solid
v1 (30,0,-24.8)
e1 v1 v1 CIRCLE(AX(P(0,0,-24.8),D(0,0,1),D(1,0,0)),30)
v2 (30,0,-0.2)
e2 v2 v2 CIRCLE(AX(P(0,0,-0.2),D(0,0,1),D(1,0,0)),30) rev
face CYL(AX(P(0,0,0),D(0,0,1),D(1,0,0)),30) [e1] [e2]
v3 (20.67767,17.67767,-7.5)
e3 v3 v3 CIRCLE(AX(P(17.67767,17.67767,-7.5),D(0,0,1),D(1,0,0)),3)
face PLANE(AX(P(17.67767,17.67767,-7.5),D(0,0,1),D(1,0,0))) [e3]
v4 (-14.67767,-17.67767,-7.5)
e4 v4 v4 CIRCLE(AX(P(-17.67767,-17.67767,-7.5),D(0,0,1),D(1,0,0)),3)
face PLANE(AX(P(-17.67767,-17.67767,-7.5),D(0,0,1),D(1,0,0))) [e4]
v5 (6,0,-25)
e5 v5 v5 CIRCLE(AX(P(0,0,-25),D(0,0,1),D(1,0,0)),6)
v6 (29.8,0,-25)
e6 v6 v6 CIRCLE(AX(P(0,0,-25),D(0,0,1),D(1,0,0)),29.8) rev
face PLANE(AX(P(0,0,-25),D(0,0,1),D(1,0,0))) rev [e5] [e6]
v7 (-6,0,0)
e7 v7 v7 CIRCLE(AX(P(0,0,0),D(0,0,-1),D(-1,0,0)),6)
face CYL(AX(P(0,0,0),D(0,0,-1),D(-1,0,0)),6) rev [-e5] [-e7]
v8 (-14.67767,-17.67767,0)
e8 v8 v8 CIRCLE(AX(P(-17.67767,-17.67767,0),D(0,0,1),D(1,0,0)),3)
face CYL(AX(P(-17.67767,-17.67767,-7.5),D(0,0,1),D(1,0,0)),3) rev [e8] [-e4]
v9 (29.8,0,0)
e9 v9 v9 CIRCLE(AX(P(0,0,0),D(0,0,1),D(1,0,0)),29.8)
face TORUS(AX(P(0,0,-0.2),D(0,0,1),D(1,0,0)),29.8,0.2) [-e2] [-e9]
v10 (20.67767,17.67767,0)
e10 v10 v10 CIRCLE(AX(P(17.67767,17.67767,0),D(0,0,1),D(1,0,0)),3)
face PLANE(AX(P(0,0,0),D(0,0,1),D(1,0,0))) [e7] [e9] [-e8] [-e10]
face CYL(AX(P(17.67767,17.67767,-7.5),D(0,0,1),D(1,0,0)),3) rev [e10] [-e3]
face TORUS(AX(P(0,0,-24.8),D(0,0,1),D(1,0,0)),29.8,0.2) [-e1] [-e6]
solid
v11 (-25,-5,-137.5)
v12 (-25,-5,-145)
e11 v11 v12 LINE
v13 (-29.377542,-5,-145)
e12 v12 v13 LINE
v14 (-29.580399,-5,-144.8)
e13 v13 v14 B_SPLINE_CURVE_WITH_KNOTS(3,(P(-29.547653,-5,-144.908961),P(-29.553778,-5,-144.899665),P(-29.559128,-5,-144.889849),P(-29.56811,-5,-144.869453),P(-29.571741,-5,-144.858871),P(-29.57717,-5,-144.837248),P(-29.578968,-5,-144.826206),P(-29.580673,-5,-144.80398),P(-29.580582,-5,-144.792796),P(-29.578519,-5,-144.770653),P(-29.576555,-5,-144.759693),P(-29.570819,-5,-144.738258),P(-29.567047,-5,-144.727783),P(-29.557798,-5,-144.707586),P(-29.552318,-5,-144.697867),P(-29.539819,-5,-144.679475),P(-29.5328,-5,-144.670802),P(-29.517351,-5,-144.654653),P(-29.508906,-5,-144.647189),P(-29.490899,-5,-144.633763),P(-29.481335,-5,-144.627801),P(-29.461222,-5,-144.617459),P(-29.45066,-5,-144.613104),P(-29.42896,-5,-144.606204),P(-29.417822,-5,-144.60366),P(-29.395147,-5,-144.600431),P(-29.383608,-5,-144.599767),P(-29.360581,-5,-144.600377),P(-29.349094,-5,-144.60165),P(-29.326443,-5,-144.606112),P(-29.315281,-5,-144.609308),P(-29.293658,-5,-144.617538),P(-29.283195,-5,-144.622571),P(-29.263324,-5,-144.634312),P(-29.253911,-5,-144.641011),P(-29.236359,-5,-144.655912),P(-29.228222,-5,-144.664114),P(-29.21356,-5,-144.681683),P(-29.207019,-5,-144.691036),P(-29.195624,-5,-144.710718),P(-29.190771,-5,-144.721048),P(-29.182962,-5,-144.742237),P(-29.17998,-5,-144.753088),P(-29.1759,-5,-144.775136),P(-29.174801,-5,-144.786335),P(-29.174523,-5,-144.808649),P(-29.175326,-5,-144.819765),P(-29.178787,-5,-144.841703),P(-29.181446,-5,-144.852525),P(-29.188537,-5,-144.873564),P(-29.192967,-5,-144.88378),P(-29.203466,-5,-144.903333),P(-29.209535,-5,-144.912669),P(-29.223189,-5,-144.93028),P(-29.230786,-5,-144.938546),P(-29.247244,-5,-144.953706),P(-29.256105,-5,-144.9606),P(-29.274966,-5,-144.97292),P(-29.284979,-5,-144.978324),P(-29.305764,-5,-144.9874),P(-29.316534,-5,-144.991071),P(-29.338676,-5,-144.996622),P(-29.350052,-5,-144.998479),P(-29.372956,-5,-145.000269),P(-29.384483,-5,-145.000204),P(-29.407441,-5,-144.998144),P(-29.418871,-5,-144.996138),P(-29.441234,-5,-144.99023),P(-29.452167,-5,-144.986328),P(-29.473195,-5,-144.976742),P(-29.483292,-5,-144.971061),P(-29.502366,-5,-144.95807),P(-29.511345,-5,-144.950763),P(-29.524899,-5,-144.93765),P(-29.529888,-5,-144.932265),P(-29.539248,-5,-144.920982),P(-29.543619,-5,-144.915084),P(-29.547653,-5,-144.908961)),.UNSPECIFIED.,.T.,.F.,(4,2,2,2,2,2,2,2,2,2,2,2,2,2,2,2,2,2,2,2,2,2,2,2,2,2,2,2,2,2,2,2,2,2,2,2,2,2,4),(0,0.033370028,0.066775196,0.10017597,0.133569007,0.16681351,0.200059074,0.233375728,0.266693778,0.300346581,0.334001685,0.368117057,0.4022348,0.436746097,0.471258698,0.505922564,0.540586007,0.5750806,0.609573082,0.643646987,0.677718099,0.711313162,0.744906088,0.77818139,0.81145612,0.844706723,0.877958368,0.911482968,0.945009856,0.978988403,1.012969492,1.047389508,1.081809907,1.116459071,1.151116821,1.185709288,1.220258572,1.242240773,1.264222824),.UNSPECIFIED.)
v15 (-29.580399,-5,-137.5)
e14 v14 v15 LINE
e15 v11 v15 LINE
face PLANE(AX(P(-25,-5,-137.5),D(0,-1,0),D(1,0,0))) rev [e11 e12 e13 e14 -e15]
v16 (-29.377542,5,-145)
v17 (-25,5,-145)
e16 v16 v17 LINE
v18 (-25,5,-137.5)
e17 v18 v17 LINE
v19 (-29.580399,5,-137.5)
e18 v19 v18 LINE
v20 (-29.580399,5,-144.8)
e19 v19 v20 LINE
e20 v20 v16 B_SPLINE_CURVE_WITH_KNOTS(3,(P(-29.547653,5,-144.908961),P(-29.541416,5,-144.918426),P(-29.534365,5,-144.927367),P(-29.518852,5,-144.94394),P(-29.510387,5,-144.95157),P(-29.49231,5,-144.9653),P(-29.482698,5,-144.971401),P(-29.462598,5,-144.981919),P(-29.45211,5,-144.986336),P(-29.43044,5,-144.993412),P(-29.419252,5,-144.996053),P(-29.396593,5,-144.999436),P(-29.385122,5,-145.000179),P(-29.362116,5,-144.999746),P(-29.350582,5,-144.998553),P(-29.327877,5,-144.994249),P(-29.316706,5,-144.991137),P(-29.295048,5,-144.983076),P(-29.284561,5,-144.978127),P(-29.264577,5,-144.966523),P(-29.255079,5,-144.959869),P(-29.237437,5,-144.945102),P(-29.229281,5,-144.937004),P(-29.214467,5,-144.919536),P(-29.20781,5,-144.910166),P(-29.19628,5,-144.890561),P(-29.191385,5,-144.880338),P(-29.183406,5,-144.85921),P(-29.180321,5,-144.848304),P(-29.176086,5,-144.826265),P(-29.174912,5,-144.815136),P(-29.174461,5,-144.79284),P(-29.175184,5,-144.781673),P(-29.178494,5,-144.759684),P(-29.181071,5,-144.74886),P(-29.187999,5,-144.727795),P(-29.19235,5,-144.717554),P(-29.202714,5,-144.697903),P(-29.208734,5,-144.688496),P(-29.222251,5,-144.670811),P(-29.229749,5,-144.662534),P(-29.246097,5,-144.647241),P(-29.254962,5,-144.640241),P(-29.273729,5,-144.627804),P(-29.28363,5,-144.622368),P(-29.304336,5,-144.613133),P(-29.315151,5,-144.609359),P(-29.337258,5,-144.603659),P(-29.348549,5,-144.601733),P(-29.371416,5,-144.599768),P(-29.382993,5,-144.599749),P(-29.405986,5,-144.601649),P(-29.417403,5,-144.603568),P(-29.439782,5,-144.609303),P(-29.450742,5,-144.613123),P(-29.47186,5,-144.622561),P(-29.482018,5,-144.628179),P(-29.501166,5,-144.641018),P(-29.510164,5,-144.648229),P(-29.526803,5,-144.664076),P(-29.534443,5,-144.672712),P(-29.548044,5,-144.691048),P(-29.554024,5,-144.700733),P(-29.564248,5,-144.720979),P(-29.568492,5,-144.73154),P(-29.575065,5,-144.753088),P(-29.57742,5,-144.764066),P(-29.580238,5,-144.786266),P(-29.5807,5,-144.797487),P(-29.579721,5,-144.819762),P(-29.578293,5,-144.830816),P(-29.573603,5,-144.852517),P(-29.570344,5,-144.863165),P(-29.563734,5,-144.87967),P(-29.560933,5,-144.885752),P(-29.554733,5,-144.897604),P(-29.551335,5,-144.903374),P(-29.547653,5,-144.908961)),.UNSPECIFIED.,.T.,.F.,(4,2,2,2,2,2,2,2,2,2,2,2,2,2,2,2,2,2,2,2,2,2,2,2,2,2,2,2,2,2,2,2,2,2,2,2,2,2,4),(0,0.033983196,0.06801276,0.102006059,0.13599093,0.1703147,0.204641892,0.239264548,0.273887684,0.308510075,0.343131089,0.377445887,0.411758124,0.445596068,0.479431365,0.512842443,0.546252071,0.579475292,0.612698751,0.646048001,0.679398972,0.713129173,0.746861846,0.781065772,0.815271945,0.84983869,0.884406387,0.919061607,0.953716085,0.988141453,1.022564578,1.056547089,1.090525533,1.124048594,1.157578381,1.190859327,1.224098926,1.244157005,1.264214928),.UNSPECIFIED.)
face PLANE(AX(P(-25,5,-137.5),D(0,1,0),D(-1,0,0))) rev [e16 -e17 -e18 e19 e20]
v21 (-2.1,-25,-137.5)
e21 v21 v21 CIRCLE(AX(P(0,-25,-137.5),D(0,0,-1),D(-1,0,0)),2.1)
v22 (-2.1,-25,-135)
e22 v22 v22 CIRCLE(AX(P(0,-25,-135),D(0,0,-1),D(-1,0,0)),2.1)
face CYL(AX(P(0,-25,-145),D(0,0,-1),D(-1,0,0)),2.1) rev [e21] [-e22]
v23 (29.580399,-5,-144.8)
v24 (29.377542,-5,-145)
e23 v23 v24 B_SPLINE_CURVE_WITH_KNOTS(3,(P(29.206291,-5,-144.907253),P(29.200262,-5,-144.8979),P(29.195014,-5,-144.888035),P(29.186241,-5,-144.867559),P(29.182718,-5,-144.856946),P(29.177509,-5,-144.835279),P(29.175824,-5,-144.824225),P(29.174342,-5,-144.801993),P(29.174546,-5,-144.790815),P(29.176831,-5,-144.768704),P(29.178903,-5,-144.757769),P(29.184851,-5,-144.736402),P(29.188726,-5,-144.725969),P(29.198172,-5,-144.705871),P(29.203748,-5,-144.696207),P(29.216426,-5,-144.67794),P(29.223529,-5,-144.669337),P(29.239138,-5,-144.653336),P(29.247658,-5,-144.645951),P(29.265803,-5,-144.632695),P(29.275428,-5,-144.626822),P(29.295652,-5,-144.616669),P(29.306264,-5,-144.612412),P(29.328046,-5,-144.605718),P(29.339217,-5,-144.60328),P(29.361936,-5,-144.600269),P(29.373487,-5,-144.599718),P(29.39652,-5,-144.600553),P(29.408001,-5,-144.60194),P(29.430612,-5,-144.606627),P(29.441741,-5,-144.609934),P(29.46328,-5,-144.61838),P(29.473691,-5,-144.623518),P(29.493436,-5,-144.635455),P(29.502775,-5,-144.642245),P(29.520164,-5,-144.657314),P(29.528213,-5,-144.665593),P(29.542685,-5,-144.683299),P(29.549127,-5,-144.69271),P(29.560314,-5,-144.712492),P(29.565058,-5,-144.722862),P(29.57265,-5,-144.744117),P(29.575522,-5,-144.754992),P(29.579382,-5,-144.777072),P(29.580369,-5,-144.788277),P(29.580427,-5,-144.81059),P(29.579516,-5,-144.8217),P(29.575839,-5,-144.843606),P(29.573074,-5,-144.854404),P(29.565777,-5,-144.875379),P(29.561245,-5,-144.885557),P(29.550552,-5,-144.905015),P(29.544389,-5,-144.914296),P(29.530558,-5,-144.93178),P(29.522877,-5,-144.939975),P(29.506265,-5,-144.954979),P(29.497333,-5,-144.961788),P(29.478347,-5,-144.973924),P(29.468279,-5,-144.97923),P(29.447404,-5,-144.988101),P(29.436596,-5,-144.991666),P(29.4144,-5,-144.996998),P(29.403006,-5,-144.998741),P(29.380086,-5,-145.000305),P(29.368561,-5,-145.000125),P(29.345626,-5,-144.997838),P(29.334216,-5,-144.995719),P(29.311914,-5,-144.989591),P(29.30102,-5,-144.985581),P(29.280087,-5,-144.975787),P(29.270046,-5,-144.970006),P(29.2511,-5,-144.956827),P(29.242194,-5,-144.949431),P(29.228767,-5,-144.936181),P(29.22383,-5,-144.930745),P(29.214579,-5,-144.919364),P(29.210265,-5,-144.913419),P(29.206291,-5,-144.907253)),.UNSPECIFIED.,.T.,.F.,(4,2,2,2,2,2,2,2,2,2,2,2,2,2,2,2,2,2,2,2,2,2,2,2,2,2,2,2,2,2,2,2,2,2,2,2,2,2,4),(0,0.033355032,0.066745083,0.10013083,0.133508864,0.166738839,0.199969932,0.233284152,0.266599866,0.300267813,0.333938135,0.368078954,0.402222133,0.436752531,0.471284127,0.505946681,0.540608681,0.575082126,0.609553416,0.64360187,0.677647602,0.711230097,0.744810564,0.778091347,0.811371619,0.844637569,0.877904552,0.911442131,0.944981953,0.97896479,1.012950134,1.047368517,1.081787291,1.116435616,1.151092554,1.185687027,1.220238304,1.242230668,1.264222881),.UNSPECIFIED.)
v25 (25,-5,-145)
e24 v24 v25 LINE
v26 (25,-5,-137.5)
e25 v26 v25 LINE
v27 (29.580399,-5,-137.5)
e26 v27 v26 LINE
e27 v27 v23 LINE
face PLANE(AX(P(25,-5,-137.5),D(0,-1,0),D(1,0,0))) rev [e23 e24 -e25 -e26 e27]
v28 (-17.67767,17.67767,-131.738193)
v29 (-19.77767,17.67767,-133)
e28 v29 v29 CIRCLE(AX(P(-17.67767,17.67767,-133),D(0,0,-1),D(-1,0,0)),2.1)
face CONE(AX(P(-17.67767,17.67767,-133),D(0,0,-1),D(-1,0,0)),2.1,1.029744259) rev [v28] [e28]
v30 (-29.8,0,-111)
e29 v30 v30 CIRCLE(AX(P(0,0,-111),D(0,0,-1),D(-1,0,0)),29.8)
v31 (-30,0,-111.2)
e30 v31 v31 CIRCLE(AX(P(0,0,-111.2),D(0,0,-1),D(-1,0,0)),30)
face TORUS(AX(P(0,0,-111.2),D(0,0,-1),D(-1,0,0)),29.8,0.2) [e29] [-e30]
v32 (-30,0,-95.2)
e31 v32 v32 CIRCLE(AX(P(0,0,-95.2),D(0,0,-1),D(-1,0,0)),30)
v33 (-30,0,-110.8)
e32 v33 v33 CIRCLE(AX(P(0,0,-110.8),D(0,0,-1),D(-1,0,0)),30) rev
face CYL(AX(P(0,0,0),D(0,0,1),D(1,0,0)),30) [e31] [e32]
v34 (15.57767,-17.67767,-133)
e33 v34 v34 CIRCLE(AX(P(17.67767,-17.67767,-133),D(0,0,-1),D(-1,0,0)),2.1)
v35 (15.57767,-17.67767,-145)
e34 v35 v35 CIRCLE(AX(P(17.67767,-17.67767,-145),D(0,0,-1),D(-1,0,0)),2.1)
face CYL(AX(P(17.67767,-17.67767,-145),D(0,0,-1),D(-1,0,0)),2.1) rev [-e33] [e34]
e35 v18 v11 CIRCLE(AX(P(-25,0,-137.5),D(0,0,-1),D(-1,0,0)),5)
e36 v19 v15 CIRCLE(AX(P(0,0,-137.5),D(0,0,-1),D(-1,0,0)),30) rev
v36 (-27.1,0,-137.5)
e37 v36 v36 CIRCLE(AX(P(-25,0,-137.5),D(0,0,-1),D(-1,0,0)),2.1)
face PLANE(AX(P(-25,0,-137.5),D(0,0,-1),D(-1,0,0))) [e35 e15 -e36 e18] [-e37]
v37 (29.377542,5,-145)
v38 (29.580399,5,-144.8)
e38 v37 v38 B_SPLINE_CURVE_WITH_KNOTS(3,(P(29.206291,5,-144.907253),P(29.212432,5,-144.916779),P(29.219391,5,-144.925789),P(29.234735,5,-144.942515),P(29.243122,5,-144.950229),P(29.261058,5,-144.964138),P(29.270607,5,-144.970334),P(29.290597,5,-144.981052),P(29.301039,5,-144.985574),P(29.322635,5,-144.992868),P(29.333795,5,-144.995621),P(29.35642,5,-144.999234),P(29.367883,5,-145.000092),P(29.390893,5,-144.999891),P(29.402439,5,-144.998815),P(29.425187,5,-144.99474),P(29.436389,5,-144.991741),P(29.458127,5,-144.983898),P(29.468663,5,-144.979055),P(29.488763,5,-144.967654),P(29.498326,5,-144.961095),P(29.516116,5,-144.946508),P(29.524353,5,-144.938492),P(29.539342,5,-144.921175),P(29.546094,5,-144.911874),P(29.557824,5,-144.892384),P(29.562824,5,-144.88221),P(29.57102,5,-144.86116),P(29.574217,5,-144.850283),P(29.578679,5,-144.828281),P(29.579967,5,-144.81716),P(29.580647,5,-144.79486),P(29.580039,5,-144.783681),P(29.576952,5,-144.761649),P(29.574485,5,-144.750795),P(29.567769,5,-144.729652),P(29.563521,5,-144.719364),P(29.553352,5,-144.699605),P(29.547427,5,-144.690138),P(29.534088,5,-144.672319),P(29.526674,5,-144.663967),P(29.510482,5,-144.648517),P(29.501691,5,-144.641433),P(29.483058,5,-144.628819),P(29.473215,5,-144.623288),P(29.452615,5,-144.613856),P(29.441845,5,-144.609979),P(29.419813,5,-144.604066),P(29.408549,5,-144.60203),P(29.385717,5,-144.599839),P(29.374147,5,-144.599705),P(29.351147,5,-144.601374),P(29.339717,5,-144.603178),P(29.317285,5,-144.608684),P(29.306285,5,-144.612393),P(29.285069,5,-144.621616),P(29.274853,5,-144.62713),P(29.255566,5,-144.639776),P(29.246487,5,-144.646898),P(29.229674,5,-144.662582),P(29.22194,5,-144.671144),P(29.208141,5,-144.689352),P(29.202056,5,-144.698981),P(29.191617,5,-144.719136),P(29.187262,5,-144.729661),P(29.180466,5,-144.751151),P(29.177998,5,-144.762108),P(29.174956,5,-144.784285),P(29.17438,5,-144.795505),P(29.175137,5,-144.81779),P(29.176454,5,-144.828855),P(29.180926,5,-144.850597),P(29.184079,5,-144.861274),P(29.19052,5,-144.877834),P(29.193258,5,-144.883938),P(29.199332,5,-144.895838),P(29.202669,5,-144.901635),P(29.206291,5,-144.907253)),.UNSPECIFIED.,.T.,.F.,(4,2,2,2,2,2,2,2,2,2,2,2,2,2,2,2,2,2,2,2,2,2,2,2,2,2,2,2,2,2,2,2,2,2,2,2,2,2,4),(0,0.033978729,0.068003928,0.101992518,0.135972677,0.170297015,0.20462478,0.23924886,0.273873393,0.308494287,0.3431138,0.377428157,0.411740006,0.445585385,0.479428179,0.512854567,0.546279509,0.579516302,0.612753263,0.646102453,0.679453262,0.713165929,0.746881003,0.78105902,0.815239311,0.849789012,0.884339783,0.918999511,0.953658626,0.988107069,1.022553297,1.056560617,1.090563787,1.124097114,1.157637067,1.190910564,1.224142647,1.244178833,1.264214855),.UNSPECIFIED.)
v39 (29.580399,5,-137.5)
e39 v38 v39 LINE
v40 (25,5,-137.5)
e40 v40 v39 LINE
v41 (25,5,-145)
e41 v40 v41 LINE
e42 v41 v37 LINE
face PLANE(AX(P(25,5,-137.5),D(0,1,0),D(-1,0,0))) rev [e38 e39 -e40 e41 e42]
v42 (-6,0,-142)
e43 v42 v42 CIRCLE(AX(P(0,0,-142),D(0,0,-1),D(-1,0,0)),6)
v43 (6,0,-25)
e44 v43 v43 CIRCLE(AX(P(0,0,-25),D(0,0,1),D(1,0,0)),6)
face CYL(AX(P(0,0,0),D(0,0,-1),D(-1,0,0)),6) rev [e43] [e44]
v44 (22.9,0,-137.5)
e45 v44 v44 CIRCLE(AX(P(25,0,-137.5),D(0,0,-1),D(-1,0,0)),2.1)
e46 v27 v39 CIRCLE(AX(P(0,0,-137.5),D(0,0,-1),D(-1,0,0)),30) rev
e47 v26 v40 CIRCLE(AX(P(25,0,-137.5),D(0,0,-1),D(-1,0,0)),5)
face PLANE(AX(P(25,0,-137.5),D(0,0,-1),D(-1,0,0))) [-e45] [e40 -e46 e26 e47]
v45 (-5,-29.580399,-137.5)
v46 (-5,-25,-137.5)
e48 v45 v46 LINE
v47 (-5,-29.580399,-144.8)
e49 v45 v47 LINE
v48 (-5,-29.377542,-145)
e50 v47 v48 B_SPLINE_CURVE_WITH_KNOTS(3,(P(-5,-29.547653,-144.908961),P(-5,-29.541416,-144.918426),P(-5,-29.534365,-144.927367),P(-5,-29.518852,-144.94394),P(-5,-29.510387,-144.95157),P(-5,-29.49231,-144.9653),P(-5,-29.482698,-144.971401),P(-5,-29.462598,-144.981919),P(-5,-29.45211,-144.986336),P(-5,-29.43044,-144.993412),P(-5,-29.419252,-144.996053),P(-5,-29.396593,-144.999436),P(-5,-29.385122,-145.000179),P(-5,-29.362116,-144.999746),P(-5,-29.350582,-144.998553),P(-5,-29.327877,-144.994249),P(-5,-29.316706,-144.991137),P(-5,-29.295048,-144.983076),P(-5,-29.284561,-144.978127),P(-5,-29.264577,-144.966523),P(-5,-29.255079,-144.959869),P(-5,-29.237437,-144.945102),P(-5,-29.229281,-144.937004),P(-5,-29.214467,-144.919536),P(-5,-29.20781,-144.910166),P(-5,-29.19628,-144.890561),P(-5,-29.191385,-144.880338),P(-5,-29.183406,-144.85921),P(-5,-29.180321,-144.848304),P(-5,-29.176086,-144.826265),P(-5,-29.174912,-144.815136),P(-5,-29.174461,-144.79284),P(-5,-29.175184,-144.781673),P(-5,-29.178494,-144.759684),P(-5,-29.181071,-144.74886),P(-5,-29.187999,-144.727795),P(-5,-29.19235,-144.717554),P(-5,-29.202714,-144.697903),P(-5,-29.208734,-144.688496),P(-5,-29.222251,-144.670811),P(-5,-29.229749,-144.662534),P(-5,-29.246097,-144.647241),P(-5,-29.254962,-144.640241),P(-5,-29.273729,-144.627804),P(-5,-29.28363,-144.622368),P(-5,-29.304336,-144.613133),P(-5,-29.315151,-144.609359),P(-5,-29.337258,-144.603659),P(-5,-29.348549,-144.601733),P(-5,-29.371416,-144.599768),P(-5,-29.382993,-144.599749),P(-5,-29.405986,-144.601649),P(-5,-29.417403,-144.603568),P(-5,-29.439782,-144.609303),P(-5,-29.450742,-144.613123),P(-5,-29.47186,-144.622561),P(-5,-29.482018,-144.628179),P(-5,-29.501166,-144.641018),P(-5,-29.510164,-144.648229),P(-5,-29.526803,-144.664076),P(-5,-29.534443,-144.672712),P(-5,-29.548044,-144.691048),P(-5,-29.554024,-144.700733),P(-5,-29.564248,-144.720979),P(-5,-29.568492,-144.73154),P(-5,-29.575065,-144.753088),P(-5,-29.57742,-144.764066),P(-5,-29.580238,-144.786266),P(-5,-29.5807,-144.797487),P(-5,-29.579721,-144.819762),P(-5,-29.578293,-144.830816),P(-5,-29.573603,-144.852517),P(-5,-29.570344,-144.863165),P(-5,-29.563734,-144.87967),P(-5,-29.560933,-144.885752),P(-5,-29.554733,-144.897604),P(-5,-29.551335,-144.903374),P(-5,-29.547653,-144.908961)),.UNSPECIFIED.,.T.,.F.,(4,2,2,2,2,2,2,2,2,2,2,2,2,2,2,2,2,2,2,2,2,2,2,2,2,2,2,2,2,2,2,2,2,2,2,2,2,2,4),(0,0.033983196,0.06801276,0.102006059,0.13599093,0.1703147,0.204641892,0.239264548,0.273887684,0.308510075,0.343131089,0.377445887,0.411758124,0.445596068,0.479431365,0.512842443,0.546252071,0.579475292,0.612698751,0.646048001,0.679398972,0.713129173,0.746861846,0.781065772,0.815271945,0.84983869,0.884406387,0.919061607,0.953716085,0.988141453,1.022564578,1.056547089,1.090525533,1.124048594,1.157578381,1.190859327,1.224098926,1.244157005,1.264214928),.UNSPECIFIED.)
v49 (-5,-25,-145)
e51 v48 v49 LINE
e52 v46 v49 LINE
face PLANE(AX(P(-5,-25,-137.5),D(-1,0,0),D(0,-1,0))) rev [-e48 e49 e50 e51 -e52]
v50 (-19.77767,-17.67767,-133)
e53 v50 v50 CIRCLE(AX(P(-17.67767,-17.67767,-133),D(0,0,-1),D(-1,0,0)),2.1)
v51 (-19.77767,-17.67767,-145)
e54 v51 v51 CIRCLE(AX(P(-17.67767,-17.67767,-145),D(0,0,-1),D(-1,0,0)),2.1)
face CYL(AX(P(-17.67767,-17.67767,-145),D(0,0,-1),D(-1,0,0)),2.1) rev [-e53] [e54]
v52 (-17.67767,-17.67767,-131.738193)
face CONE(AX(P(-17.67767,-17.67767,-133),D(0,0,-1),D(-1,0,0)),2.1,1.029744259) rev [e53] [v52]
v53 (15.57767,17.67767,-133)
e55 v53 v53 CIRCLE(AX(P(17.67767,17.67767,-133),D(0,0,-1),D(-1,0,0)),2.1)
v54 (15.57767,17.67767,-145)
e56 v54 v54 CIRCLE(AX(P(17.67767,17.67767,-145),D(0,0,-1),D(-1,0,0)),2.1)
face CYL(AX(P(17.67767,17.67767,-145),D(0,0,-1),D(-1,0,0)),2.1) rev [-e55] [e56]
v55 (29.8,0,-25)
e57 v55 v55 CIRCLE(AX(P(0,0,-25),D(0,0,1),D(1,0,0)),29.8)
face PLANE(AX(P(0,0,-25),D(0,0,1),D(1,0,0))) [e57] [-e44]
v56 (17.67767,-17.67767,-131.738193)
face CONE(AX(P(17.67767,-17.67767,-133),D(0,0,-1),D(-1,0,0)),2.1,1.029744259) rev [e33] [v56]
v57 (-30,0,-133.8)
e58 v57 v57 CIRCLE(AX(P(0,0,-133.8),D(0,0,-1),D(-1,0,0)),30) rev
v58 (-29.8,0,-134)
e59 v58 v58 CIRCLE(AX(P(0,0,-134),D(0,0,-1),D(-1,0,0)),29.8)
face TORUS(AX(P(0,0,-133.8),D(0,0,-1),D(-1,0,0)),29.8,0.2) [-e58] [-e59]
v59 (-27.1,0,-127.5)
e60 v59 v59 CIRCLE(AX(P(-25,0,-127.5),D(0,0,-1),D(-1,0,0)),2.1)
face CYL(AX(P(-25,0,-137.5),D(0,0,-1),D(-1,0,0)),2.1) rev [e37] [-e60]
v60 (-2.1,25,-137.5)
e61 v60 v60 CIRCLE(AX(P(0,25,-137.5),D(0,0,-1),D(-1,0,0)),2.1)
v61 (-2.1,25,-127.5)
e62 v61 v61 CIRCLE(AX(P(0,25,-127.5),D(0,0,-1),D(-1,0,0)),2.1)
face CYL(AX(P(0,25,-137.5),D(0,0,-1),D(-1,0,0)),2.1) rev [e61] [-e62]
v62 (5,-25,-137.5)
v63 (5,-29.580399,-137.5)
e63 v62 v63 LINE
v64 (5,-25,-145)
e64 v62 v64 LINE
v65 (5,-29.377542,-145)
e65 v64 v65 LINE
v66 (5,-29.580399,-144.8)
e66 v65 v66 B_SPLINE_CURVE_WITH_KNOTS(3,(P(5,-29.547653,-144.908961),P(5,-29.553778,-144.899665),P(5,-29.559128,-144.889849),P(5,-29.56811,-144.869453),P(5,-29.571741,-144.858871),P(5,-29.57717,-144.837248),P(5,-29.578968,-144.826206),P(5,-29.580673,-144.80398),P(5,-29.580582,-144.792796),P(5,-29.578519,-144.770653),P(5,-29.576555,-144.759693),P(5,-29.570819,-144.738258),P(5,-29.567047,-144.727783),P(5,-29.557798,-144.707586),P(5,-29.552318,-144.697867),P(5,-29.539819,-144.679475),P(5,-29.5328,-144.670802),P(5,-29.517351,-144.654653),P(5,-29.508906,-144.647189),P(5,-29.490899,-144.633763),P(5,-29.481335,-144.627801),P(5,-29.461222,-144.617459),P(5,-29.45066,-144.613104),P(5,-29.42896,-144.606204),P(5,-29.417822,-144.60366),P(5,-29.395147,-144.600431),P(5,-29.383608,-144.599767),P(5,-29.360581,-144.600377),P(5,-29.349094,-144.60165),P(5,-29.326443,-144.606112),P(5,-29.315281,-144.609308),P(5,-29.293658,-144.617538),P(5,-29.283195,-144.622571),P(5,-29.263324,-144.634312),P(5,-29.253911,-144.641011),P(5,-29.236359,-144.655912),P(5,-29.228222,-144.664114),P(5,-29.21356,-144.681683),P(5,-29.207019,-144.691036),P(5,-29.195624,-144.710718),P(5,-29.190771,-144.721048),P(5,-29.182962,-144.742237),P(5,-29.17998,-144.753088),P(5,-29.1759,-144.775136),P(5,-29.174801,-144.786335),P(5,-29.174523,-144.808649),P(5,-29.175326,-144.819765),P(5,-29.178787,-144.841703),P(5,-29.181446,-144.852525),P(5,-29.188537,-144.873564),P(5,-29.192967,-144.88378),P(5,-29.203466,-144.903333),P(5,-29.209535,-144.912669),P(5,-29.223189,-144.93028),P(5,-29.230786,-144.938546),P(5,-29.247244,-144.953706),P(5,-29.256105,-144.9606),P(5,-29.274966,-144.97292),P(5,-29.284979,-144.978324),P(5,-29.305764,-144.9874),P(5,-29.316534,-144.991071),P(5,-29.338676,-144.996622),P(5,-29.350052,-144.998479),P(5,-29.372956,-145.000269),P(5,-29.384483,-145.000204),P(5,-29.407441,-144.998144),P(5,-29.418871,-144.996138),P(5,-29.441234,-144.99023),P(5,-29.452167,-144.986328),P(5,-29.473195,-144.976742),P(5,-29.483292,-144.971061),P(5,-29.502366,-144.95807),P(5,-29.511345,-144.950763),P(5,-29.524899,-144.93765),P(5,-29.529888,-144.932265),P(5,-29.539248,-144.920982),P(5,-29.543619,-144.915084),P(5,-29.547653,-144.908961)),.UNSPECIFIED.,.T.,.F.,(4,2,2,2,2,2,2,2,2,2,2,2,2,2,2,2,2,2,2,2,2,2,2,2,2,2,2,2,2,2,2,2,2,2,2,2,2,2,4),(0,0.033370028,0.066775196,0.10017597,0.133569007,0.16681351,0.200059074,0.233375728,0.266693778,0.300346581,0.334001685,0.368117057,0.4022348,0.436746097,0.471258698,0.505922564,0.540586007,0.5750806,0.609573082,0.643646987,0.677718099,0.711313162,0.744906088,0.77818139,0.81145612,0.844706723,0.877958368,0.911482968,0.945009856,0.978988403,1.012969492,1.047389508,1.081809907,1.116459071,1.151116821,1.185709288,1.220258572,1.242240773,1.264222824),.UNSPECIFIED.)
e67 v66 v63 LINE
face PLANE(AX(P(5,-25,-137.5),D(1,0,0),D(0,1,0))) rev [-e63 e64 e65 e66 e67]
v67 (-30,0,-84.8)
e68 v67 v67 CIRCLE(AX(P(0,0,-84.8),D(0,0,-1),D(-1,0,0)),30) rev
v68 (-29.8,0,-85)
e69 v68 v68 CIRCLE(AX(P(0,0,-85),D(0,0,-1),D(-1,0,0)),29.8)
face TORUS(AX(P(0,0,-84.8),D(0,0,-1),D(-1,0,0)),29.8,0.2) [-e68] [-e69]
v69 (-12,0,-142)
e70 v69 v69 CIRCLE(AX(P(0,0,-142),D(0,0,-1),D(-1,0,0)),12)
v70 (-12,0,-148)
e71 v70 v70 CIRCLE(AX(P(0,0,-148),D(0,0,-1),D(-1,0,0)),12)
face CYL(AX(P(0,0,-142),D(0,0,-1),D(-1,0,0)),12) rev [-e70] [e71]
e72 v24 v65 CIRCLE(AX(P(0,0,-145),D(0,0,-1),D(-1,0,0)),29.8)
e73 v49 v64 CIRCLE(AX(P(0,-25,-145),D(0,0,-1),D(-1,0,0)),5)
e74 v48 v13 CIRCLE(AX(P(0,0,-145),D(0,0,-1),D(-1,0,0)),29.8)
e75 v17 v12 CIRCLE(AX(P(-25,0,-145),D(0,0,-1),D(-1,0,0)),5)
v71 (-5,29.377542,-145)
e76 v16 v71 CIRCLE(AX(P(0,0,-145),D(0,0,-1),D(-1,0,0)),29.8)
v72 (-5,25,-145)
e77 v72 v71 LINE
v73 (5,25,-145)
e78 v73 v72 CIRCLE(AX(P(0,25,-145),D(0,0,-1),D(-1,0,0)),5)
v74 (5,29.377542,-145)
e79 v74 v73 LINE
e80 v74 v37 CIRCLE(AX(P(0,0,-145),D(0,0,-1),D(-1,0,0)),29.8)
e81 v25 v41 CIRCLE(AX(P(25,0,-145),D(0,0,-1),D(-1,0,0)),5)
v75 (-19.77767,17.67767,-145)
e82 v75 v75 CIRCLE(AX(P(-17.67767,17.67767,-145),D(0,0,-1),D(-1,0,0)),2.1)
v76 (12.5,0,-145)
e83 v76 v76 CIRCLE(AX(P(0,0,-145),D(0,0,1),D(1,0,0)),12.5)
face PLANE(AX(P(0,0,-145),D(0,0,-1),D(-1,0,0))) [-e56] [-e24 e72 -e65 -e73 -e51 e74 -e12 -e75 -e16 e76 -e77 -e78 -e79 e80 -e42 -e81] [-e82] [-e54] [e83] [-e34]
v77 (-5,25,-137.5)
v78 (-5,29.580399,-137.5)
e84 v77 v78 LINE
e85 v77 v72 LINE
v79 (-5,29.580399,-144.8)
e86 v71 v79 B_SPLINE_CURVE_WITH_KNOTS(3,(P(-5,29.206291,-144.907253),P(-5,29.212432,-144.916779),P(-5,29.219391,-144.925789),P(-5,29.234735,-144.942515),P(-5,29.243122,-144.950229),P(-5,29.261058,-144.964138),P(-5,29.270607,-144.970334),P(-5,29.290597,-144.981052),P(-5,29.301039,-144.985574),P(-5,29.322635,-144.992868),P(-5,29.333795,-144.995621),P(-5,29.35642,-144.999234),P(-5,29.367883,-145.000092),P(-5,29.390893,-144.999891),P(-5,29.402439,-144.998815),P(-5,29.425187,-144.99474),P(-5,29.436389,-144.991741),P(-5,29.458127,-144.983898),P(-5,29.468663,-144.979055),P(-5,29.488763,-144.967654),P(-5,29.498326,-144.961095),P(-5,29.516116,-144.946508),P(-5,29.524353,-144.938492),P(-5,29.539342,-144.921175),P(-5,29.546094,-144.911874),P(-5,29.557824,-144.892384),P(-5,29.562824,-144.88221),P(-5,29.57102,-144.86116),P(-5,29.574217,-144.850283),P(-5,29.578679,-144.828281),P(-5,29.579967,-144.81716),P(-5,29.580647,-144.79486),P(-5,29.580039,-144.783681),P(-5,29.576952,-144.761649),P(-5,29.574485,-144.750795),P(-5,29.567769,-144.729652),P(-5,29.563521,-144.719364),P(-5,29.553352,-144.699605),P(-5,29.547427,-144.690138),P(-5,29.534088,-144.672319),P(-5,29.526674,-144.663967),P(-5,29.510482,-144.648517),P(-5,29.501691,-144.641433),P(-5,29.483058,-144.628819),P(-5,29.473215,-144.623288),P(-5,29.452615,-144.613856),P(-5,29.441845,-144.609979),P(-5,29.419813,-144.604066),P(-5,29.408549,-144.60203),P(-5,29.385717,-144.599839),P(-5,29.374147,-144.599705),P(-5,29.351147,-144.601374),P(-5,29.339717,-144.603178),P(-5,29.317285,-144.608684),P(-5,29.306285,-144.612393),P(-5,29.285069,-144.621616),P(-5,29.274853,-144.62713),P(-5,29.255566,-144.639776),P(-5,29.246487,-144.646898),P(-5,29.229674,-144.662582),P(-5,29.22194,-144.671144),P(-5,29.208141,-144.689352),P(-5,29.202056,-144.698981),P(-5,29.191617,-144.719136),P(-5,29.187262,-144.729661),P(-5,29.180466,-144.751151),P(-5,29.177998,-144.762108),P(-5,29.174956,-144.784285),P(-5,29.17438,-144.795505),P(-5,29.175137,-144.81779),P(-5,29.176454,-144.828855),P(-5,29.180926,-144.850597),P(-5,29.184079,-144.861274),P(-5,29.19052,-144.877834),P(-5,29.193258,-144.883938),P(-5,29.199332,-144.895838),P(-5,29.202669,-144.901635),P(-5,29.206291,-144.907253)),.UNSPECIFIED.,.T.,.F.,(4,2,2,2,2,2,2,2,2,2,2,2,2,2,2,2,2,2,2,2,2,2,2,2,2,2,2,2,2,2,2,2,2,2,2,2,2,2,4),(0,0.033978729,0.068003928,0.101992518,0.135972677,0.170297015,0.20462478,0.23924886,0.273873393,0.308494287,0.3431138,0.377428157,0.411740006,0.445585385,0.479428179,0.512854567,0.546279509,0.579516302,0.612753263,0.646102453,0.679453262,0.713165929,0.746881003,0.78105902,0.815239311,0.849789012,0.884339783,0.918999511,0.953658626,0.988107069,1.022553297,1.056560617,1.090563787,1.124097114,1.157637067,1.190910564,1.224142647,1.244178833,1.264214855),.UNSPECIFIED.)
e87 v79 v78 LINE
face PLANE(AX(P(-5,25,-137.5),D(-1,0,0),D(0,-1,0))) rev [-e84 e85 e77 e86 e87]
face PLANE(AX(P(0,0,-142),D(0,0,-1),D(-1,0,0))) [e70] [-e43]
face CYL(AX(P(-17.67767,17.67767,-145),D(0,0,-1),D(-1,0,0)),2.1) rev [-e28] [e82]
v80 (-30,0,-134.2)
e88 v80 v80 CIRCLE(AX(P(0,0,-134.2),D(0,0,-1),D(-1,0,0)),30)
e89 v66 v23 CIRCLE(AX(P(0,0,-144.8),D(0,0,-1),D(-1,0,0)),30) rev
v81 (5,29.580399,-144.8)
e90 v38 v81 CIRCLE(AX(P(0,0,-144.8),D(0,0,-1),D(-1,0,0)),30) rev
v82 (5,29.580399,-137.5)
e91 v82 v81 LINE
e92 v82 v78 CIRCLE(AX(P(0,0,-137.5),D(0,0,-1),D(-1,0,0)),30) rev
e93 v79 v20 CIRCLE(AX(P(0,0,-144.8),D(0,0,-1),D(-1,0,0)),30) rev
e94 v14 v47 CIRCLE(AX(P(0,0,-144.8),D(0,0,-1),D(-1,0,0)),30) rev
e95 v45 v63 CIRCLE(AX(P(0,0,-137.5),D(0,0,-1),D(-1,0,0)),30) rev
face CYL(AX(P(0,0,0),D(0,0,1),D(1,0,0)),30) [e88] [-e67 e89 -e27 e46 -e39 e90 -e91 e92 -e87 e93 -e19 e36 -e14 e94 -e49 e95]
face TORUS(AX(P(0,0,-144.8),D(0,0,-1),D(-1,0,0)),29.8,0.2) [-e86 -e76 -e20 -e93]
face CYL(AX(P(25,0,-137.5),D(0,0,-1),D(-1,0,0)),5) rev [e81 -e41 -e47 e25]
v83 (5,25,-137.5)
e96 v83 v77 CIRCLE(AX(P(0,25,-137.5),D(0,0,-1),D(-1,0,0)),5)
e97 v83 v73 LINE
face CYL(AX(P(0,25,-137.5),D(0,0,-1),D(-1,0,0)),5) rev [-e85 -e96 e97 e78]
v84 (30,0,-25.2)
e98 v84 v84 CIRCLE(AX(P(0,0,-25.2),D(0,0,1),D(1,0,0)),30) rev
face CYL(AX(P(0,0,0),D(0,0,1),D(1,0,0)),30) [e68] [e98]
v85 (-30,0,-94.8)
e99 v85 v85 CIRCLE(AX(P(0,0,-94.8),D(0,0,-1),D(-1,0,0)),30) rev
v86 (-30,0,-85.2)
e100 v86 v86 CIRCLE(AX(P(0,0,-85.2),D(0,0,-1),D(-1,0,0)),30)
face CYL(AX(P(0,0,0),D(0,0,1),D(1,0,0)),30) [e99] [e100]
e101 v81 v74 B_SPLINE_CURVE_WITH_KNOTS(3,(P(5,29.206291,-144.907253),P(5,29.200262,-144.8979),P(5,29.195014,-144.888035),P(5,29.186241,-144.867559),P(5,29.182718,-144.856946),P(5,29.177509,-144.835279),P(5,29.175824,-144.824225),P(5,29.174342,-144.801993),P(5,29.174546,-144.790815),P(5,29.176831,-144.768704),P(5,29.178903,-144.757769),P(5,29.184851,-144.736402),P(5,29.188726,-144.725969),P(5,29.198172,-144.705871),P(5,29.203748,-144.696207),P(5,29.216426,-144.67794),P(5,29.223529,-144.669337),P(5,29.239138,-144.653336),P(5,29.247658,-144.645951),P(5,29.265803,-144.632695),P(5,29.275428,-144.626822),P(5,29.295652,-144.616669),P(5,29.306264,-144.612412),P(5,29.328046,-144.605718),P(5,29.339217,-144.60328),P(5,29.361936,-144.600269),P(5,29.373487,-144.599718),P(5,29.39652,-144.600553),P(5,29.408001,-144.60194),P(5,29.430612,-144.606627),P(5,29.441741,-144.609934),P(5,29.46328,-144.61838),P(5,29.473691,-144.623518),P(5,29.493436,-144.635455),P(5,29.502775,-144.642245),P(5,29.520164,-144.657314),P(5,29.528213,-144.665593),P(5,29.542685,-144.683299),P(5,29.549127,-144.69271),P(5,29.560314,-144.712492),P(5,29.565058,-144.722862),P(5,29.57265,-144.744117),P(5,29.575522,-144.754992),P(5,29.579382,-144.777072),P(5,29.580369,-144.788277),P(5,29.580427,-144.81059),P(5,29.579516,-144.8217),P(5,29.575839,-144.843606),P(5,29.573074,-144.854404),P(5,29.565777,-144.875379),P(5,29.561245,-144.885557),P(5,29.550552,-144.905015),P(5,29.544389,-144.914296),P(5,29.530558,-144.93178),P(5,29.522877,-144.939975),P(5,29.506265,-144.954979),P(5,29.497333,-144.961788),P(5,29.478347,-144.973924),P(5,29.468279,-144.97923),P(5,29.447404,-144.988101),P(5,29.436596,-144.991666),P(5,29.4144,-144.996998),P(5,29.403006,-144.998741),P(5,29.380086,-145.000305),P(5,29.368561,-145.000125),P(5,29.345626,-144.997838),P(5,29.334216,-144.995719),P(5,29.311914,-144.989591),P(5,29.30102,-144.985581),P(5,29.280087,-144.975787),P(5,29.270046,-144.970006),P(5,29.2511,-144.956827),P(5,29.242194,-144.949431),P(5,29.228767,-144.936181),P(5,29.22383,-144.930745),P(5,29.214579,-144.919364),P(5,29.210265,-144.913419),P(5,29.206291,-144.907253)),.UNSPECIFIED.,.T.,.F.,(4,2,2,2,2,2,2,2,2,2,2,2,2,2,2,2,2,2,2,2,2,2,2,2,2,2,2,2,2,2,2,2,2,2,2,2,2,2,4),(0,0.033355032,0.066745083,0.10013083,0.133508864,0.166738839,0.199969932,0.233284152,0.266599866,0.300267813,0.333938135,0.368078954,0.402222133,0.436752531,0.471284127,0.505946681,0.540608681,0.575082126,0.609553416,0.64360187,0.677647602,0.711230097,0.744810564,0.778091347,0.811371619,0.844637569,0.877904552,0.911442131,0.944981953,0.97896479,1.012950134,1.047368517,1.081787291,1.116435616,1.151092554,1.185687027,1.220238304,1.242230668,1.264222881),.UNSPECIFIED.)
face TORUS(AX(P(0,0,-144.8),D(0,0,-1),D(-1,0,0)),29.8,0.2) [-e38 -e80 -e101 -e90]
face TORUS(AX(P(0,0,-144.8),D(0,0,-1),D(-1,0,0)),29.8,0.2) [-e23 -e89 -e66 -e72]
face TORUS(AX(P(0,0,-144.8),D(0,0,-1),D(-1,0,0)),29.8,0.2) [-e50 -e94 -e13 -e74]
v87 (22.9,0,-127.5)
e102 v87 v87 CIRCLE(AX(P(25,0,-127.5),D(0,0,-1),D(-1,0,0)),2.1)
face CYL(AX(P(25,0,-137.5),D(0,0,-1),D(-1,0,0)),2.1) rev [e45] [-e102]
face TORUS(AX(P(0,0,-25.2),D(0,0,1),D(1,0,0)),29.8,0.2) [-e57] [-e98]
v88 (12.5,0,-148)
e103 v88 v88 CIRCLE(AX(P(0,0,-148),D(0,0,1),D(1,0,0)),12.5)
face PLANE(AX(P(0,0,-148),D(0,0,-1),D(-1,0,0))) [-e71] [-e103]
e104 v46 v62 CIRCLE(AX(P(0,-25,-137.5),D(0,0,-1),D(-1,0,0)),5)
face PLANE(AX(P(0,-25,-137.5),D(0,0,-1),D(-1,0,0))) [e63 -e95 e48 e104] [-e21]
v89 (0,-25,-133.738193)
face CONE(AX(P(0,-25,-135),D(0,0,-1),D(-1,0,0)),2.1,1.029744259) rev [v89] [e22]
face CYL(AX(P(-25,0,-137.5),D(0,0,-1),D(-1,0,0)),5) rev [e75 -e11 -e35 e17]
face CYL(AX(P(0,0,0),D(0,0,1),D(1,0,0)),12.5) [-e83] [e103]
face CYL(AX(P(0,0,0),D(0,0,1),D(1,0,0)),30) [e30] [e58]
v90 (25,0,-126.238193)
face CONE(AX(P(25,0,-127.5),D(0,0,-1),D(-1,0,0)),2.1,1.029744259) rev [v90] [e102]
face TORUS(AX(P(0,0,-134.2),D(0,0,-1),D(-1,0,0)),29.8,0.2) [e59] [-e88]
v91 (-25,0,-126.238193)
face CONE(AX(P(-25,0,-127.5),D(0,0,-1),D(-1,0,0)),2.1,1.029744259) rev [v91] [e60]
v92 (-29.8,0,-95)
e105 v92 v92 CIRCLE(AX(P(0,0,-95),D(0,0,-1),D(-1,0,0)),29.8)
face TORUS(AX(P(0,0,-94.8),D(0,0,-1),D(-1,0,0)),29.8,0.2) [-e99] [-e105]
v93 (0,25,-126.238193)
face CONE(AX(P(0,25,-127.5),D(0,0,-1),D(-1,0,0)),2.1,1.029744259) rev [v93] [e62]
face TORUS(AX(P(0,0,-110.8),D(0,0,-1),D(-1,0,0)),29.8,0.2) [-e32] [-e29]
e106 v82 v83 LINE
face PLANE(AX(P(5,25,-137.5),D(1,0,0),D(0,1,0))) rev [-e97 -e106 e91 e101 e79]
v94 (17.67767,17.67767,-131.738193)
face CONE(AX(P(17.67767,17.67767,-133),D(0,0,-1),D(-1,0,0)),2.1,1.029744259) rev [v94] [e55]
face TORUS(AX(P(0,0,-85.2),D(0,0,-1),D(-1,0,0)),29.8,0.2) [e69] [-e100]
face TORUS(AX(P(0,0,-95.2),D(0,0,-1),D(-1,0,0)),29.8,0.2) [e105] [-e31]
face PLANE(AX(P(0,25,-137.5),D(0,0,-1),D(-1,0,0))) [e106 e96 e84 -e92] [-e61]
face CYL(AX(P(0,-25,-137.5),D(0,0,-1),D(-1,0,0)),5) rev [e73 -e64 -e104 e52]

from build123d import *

# Parameters (mm, degrees)
SKETCH3_W                  = 30
SKETCH3_H                  = 25
FILLET1_R                  = 0.2
SKETCH3_3_W                = 30
SKETCH3_3_H                = 60
FILLET2_R                  = 0.2
SKETCH3_4_W                = 30
SKETCH3_4_H                = 10
FILLET3_R                  = 0.2
SKETCH3_5_W                = 30
SKETCH3_5_H                = 16
FILLET5_R                  = 0.2
SKETCH3_6_W                = 30
SKETCH3_6_H                = 23
FILLET6_R                  = 0.2
FILLET7_R                  = 0.2
SKETCH4_R                  = 12
CUT_EXTRUDE1_DEPTH         = 6
SKETCH5_R                  = 6
CUT_EXTRUDE2_DEPTH         = 149.202564121
CUT_EXTRUDE3_DEPTH         = 7.5
M5_TAPPED_HOLE2_AT_2_COUNT = 2
M5_TAPPED_HOLE2_AT_2_PITCH = 35.355339059
M5_TAPPED_HOLE2_AT_3_COUNT = 2
M5_TAPPED_HOLE2_AT_3_PITCH = 50
M5_TAPPED_HOLE2_AT_4_COUNT = 2
M5_TAPPED_HOLE2_AT_4_PITCH = 35.355339059
SKETCH11_R                 = 3
CUT_EXTRUDE4_DEPTH         = 7.5


# Read off the part's stored shape, not the designer's step: M5 Tapped Hole1
# Some blends are built 0.0001 mm under size
with BuildPart() as part:
    # Sketch3 → Revolve1 (revolve)
    with BuildSketch(Plane(origin=(0, 0, 0), x_dir=(1, 0, 0), z_dir=(0, 1, 0)), mode=Mode.PRIVATE) as revolve1_sk:
        with Locations((-15, 12.5)):
            Rectangle(SKETCH3_W, SKETCH3_H)
    revolve(revolve1_sk.sketch.rotate(Axis((0, 0, 0), (0, 0, -1)), 180), axis=Axis((0, 0, 0), (0, 0, -1)))

    # Fillet1
    fillet1_edges = [part.edges().sort_by_distance(p)[0] for p in [
        (-30, 0, 0),
        (-30, 0, -25),
    ]]
    fillet(fillet1_edges, radius=FILLET1_R)


with BuildPart() as body_2:
    # Sketch3<3> → Revolve2 (revolve)
    with BuildSketch(Plane(origin=(0, 0, 0), x_dir=(1, 0, 0), z_dir=(0, 1, 0)), mode=Mode.PRIVATE) as revolve2_sk:
        with Locations((-15, 55)):
            Rectangle(SKETCH3_3_W, SKETCH3_3_H)
    revolve(revolve2_sk.sketch.rotate(Axis((0, 0, 0), (0, 0, -1)), 180), axis=Axis((0, 0, 0), (0, 0, -1)))

    # Fillet2
    fillet2_edges = [body_2.edges().sort_by_distance(p)[0] for p in [
        (-30, 0, -25),
        (-30, 0, -85),
    ]]
    fillet(fillet2_edges, radius=FILLET2_R)

    # Sketch3<4> → Revolve3 (revolve)
    with BuildSketch(Plane(origin=(0, 0, 0), x_dir=(1, 0, 0), z_dir=(0, 1, 0))):
        with Locations((-15, 90)):
            Rectangle(SKETCH3_4_W, SKETCH3_4_H)
    revolve(axis=Axis((0, 0, 0), (0, 0, -1)))

    # Fillet3
    fillet3_edges = [body_2.edges().sort_by_distance(p)[0] for p in [
        (30, 0, -85),
        (30, 0, -95),
    ]]
    fillet(fillet3_edges, radius=FILLET3_R - 0.0001)  # a hair under: the kernel refuses the full size

    # Sketch3<5> → Revolve4 (revolve)
    with BuildSketch(Plane(origin=(0, 0, 0), x_dir=(1, 0, 0), z_dir=(0, 1, 0))):
        with Locations((-15, 103)):
            Rectangle(SKETCH3_5_W, SKETCH3_5_H)
    revolve(axis=Axis((0, 0, 0), (0, 0, -1)))

    # Fillet5
    # the kernel refuses this fillet: 0.2 mm, written as the material it takes off along each edge
    with BuildSketch(Plane(origin=(0, 0, -95), x_dir=(-1, 0, 0), z_dir=(0, -1, 0))) as fillet5_piece_1:
        with BuildLine():
            CenterArc((29.8, 0.199999975), FILLET5_R, 270.028647891, 89.971352109)
            Line((30, 0.199999975), (30, 0))
            Line((30, 0), (29.8001, 0))
        make_face()
    revolve(axis=Axis((0, 0, -95), (0, 0, -1)), mode=Mode.SUBTRACT)
    with BuildSketch(Plane(origin=(0, 0, -111), x_dir=(-1, 0, 0), z_dir=(0, -1, 0))) as fillet5_piece_2:
        with BuildLine():
            CenterArc((30 - FILLET5_R, -FILLET5_R), FILLET5_R, 0, 90)
            Line((30 - FILLET5_R, 0), (30, 0))
            Line((30, 0), (30, -FILLET5_R))
        make_face()
    revolve(axis=Axis((0, 0, -111), (0, 0, -1)), mode=Mode.SUBTRACT)

    # Sketch3<6> → Revolve5 (revolve)
    with BuildSketch(Plane(origin=(0, 0, 0), x_dir=(1, 0, 0), z_dir=(0, 1, 0))):
        with Locations((-15, 122.5)):
            Rectangle(SKETCH3_6_W, SKETCH3_6_H)
    revolve(axis=Axis((0, 0, 0), (0, 0, -1)))

    # Fillet6
    fillet6_edges = [body_2.edges().sort_by_distance(p)[0] for p in [
        (30, 0, -111),
        (30, 0, -134),
    ]]
    fillet(fillet6_edges, radius=FILLET6_R - 0.0001)  # a hair under: the kernel refuses the full size

    # Sketch3<7> → Revolve6 (revolve)
    with BuildSketch(Plane(origin=(0, 0, 0), x_dir=(1, 0, 0), z_dir=(0, 1, 0))):
        Polygon((-30, 134), (0, 134), (0, 145), (0, 148), (-12.5, 148), (-12.5, 145), (-30, 145), align=None)
    revolve(axis=Axis((0, 0, 0), (0, 0, -1)))

    # Fillet7
    # the kernel refuses this fillet: 0.2 mm, written as the material it takes off along each edge
    with BuildSketch(Plane(origin=(0, 0, -145), x_dir=(-1, 0, 0), z_dir=(0, -1, 0))) as fillet7_piece_1:
        with BuildLine():
            CenterArc((30 - FILLET7_R, -FILLET7_R), FILLET7_R, 0, 90)
            Line((30 - FILLET7_R, 0), (30, 0))
            Line((30, 0), (30, -FILLET7_R))
        make_face()
    revolve(axis=Axis((0, 0, -145), (0, 0, -1)), mode=Mode.SUBTRACT)
    with BuildSketch(Plane(origin=(0, 0, -134), x_dir=(-1, 0, 0), z_dir=(0, -1, 0))) as fillet7_piece_2:
        with BuildLine():
            CenterArc((29.8, 0.199999975), FILLET7_R, 270.028647891, 89.971352109)
            Line((30, 0.199999975), (30, 0))
            Line((30, 0), (29.8001, 0))
        make_face()
    revolve(axis=Axis((0, 0, -134), (0, 0, -1)), mode=Mode.SUBTRACT)

    # Sketch4 → Cut-Extrude1 (cut)
    with BuildSketch(Plane(origin=(0, 0, -148), x_dir=(-1, 0, 0), z_dir=(0, 0, -1))):
        Circle(SKETCH4_R)
    extrude(amount=-CUT_EXTRUDE1_DEPTH, mode=Mode.SUBTRACT)


with BuildPart() as cut_extrude2_tool:
    # Sketch5 → Cut-Extrude2 (new, through all)
    with BuildSketch(Plane(origin=(0, 0, -142), x_dir=(-1, 0, 0), z_dir=(0, 0, -1))):
        Circle(SKETCH5_R)
    extrude(amount=-CUT_EXTRUDE2_DEPTH)


with BuildPart() as part_1:
    add(part.part)

    # Cut-Extrude2: cut by cut_extrude2_tool
    add(cut_extrude2_tool.part, mode=Mode.SUBTRACT)

    # Sketch11 → Cut-Extrude4 (cut)
    with BuildSketch(Plane.XY):
        with Locations((-17.67766953, -17.67766953)):
            Circle(SKETCH11_R)
        with Locations((17.67766953, 17.67766953)):
            Circle(SKETCH11_R)
    extrude(amount=-CUT_EXTRUDE4_DEPTH, mode=Mode.SUBTRACT)


with BuildPart() as body_2_1:
    add(body_2.part)

    # Cut-Extrude2: cut by cut_extrude2_tool
    add(cut_extrude2_tool.part, mode=Mode.SUBTRACT)

    # Sketch7 → Cut-Extrude3 (cut)
    with BuildSketch(Plane(origin=(0, 0, -145), x_dir=(-1, 0, 0), z_dir=(0, 0, -1))):
        with BuildLine():
            Line((5, -25), (5, -34.718950848))
            ThreePointArc((5, -34.718950848), (0, -39.718950848), (-5, -34.718950848))
            Line((-5, -34.718950848), (-5, -25))
            ThreePointArc((-5, -25), (0, -20), (5, -25))
        make_face()
        with BuildLine():
            Line((-25, -5), (-34.718950848, -5))
            ThreePointArc((-34.718950848, -5), (-39.718950848, 0), (-34.718950848, 5))
            Line((-34.718950848, 5), (-25, 5))
            ThreePointArc((-25, 5), (-20, 0), (-25, -5))
        make_face()
        with BuildLine():
            Line((-5, 25), (-5, 34.718950848))
            ThreePointArc((-5, 34.718950848), (0, 39.718950848), (5, 34.718950848))
            Line((5, 34.718950848), (5, 25))
            ThreePointArc((5, 25), (0, 20), (-5, 25))
        make_face()
        with BuildLine():
            Line((25, 5), (34.718950848, 5))
            ThreePointArc((34.718950848, 5), (39.718950848, 0), (34.718950848, -5))
            Line((34.718950848, -5), (25, -5))
            ThreePointArc((25, -5), (20, 0), (25, 5))
        make_face()
    extrude(amount=-CUT_EXTRUDE3_DEPTH, mode=Mode.SUBTRACT)

    # M5 Tapped Hole1 outline → M5 Tapped Hole1 (revolve, cut)
    with BuildSketch(Plane(origin=(-25, 0, 0), x_dir=(1, 0, 0), z_dir=(0, -1, 0))):
        Polygon((2.1, -127.5), (0, -126.2381927), (0, -137.5), (2.1, -137.5), align=None)
    revolve(axis=Axis((-25, 0, 0), (0, 0, 1)), mode=Mode.SUBTRACT)

    # M5 Tapped Hole1 2 outline → M5 Tapped Hole1 2 (revolve, cut)
    with BuildSketch(Plane.XZ.offset(-25)):
        Polygon((2.1, -127.5), (0, -126.2381927), (0, -137.5), (2.1, -137.5), align=None)
    revolve(axis=Axis((0, 25, 0), (0, 0, 1)), mode=Mode.SUBTRACT)

    # M5 Tapped Hole1 3 outline → M5 Tapped Hole1 3 (revolve, cut)
    with BuildSketch(Plane(origin=(25, 0, 0), x_dir=(1, 0, 0), z_dir=(0, -1, 0))):
        Polygon((2.1, -127.5), (0, -126.2381927), (0, -137.5), (2.1, -137.5), align=None)
    revolve(axis=Axis((25, 0, 0), (0, 0, 1)), mode=Mode.SUBTRACT)

    # M5 Tapped Hole1 4 outline → M5 Tapped Hole1 4 (revolve, cut)
    with BuildSketch(Plane.XZ.offset(25)):
        Polygon((2.1, -135), (0, -133.7381927), (0, -137.5), (2.1, -137.5), align=None)
    revolve(axis=Axis((0, -25, 0), (0, 0, 1)), mode=Mode.SUBTRACT)

    # Sketch10 → M5 Tapped Hole2 (revolve, cut)
    with BuildSketch(Plane(origin=(17.67766953, 17.67766953, -145), x_dir=(0, 1, 0), z_dir=(1, 0, 0))):
        Polygon((0, 0), (0, 13.2618073), (2.1, 12), (2.1, 0), align=None)
    m5_tapped_hole2 = revolve(axis=Axis((17.67766953, 17.67766953, -151.35), (0, 0, 1)), mode=Mode.SUBTRACT)

    # M5 Tapped Hole2 at 2: M5 Tapped Hole2 ×2
    with Locations(*[(-i * M5_TAPPED_HOLE2_AT_2_PITCH, 0, 0) for i in range(1, M5_TAPPED_HOLE2_AT_2_COUNT)]):
        add(m5_tapped_hole2, mode=Mode.SUBTRACT)

    # M5 Tapped Hole2 at 3: M5 Tapped Hole2 ×2
    with Locations(*[Vector(-0.7071067811865471, -0.7071067811865479, 0) * (i * M5_TAPPED_HOLE2_AT_3_PITCH) for i in range(1, M5_TAPPED_HOLE2_AT_3_COUNT)]):
        add(m5_tapped_hole2, mode=Mode.SUBTRACT)

    # M5 Tapped Hole2 at 4: M5 Tapped Hole2 ×2
    with Locations(*[(0, -i * M5_TAPPED_HOLE2_AT_4_PITCH, 0) for i in range(1, M5_TAPPED_HOLE2_AT_4_COUNT)]):
        add(m5_tapped_hole2, mode=Mode.SUBTRACT)


solid = Compound([part_1.part, body_2_1.part])
